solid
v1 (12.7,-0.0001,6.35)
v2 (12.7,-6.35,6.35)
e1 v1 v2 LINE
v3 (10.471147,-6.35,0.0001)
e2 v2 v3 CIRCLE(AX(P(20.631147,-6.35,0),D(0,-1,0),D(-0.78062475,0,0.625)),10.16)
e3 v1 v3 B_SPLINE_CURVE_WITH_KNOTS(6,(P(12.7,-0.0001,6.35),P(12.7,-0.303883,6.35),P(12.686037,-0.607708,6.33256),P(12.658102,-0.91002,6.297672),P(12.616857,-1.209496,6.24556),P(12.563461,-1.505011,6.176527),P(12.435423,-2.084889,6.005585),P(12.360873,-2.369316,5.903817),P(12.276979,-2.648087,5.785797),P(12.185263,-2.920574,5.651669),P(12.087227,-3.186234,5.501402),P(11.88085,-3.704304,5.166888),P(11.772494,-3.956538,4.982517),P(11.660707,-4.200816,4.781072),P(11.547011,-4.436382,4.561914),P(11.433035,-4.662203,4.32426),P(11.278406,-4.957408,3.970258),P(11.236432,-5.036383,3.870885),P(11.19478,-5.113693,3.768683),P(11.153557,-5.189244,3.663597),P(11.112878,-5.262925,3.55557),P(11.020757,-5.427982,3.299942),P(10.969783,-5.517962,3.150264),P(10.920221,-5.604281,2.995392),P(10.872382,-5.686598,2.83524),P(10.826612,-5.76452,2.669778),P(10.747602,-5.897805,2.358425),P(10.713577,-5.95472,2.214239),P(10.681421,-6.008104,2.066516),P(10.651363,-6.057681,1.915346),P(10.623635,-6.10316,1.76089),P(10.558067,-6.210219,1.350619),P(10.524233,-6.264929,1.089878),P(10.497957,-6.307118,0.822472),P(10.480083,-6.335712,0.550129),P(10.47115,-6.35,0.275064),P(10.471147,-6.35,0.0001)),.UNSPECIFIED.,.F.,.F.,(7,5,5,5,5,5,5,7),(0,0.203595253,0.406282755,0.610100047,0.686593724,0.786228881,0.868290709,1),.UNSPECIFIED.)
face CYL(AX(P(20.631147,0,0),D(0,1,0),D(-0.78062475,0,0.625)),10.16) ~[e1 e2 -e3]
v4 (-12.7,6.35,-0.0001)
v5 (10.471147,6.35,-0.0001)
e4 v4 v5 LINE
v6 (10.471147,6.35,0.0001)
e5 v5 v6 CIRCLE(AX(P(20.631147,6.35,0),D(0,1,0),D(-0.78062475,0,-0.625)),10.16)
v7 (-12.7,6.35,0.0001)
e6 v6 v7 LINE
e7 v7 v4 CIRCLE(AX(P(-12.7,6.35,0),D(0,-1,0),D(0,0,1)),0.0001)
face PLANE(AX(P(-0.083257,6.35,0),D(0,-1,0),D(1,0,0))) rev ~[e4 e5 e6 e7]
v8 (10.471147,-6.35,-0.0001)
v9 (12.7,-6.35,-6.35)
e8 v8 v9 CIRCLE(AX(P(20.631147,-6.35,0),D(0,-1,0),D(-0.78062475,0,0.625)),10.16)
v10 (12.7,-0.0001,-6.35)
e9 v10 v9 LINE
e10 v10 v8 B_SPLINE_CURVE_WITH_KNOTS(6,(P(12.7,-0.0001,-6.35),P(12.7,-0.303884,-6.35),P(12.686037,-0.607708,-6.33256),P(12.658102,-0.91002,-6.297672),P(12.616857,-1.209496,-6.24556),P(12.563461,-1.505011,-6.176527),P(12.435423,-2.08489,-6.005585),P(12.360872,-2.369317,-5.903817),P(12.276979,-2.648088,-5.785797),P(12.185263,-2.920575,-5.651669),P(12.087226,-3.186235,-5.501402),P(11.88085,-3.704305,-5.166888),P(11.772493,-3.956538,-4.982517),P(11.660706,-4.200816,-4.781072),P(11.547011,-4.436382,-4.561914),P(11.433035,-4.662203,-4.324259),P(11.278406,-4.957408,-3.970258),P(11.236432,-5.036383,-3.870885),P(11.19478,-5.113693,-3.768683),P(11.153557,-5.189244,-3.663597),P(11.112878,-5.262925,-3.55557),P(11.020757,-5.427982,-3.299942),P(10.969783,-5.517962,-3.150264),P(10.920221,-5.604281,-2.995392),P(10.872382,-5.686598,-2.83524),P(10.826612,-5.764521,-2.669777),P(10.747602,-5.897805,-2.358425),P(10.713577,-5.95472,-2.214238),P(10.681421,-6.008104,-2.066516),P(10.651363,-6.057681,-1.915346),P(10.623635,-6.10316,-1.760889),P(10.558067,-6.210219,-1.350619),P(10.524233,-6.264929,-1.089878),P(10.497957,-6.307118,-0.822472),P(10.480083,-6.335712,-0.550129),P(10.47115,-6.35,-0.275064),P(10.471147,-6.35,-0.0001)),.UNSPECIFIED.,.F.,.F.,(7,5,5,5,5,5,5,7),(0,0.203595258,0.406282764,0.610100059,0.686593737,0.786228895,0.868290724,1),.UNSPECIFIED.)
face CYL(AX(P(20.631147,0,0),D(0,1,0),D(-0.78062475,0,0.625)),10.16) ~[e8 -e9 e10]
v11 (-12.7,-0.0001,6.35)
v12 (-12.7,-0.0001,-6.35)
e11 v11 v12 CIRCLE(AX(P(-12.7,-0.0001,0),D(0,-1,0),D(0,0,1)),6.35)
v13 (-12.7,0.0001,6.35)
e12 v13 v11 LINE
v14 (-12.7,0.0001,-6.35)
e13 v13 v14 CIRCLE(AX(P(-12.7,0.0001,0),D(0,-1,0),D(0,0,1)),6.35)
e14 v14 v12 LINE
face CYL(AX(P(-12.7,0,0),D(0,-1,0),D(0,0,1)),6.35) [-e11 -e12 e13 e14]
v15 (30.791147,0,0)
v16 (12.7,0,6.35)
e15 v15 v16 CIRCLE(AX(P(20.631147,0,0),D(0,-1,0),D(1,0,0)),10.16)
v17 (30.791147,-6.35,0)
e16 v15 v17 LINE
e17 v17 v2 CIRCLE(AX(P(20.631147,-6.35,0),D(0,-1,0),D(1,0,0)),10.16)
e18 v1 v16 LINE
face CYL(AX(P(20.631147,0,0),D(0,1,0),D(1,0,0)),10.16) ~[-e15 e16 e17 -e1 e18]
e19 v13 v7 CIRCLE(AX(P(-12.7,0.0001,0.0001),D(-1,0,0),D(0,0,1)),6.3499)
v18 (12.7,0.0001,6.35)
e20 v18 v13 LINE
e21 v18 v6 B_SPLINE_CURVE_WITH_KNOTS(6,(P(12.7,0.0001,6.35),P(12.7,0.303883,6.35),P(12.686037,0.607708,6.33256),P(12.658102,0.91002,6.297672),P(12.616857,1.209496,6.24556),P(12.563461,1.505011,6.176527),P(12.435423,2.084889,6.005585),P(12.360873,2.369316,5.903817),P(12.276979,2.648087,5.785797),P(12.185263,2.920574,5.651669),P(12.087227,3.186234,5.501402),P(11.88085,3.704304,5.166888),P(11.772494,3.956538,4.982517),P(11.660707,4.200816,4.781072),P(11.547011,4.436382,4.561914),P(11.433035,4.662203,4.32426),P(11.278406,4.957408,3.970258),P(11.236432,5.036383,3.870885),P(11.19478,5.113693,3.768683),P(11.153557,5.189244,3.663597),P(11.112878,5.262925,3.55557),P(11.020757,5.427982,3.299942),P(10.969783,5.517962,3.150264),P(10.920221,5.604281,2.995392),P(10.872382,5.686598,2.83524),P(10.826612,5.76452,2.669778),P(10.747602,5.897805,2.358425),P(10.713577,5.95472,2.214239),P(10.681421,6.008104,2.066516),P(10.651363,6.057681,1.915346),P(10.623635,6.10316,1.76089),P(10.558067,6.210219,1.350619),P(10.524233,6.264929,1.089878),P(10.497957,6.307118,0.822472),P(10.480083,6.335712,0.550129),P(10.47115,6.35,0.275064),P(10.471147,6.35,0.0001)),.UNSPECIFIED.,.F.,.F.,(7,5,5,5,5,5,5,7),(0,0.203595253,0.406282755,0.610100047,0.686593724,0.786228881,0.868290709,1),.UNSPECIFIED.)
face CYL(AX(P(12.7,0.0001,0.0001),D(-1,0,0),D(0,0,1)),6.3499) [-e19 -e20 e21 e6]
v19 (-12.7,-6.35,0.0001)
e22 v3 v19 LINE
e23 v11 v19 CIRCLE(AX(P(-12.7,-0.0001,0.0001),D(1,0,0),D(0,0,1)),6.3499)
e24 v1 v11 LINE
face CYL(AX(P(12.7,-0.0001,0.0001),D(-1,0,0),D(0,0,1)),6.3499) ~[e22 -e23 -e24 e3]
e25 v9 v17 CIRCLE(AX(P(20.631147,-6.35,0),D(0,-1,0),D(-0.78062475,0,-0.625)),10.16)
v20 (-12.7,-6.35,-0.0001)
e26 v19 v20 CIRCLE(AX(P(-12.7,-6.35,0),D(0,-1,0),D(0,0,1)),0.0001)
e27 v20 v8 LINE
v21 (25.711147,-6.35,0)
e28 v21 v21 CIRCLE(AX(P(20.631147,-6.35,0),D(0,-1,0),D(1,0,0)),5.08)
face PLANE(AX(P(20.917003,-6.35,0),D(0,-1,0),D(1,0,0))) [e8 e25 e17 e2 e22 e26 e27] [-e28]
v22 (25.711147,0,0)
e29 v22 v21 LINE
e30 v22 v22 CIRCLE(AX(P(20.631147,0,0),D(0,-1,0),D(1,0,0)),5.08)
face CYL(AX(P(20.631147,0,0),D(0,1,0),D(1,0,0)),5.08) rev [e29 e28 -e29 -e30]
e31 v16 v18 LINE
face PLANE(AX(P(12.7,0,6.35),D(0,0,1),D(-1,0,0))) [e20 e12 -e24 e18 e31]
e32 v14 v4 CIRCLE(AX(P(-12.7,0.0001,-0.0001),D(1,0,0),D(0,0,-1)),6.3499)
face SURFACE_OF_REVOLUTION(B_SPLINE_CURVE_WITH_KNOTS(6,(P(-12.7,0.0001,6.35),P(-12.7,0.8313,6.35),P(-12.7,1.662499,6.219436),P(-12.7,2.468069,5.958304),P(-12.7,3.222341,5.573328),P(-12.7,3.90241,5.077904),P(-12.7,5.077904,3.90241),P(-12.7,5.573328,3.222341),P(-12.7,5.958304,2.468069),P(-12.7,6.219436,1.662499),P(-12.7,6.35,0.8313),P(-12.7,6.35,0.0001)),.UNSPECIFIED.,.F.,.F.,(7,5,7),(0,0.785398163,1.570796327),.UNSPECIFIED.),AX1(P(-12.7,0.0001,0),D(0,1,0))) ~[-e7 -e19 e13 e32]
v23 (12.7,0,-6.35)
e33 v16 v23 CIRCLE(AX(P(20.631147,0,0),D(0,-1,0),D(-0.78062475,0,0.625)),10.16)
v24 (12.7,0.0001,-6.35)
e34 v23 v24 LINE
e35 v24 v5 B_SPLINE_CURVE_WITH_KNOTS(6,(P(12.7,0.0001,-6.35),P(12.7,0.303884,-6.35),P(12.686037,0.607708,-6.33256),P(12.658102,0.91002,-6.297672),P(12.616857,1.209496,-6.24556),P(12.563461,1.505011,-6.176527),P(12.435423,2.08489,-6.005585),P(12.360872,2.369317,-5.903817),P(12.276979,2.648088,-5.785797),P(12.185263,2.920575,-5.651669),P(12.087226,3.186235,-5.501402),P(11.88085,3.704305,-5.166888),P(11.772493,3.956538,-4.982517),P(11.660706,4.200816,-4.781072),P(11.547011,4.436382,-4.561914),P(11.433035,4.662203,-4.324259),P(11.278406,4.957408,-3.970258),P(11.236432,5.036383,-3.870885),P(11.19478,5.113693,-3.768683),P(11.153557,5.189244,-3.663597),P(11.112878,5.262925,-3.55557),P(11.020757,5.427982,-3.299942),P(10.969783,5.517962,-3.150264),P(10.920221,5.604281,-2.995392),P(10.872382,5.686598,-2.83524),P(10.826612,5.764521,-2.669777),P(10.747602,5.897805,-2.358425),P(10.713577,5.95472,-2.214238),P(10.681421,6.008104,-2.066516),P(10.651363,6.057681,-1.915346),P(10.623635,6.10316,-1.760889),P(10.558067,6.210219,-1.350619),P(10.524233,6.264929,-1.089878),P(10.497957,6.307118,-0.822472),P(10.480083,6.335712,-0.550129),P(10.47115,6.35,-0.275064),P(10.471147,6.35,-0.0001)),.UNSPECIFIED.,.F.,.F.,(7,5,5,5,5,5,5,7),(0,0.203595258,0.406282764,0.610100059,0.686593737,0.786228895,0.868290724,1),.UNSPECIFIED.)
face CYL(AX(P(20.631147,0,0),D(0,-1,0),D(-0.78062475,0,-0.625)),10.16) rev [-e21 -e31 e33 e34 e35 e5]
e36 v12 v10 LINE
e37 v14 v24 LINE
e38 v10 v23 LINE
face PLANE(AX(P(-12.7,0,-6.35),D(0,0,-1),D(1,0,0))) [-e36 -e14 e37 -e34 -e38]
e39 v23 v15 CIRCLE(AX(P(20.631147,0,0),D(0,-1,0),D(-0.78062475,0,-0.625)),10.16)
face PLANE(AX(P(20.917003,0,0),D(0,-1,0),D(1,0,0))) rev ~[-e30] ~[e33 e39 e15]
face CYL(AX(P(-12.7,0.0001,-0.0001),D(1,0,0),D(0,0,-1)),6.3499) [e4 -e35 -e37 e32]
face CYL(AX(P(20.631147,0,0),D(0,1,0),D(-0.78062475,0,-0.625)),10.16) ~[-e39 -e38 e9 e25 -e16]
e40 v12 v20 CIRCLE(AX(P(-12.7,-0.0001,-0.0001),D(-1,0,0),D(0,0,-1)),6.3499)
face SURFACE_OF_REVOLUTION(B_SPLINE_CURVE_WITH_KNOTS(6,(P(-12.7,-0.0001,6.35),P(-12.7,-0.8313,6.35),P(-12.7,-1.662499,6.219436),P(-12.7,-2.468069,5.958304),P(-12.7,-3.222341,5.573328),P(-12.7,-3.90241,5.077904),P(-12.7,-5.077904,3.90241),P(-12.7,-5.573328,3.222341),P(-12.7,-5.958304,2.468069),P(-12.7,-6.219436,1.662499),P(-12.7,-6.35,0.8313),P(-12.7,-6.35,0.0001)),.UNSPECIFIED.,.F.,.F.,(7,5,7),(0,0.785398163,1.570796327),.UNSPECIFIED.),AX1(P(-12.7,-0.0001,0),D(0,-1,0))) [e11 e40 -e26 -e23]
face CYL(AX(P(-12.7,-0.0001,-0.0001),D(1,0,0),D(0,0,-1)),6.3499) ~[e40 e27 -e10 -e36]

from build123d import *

# Parameters (mm, degrees)
F1_DEPTH = 6.35
F2_R     = 6.3499
F0_R     = 5.08
F3_DEPTH = 6.35


# Not quite as in the source:
# - a fillet or chamfer is up to 0.001 mm smaller than in the source, because OpenCascade refuses the exact size


with BuildPart() as f1:
    # F0 (on Front) → F1 (new body, symmetric)
    with BuildSketch(Plane.XZ):
        with BuildLine():
            Line((12.7, 6.35), (-12.7, 6.35))
            Line((-12.7, 6.35), (-12.7, -6.35))
            Line((-12.7, -6.35), (12.7, -6.35))
            ThreePointArc((12.7, -6.35), (10.471147458, 0), (12.7, 6.35))
        make_face()
        with BuildLine():
            Line((-12.7, -6.35), (-12.7, 6.35))
            ThreePointArc((-12.7, 6.35), (-19.05, 0), (-12.7, -6.35))
        make_face()
    extrude(amount=F1_DEPTH, both=True)

    # F2 (radius 6.35 in the source; OpenCascade refuses exactly that, so slightly less here)
    f2_edges = [f1.edges().sort_by_distance(p)[0] for p in [
        (0, -6.35, 6.35),
        (0, 6.35, 6.35),
        (0, -6.35, -6.35),
        (0, 6.35, -6.35),
    ]]
    fillet(f2_edges, radius=F2_R)

    # F0 (on Front) → F3 (join)
    with BuildSketch(Plane.XZ):
        with BuildLine():
            ThreePointArc((30.791147458, 0), (23.9960502669, 9.5866067556), (12.7, 6.35))
            Line((12.7, 6.35), (12.7, -6.35))
            ThreePointArc((12.7, -6.35), (23.9960502669, -9.5866067556), (30.791147458, 0))
        make_face()
        with Locations((20.631147458, 0)):
            Circle(F0_R, mode=Mode.SUBTRACT)
        with BuildLine():
            Line((12.7, -6.35), (12.7, 6.35))
            ThreePointArc((12.7, 6.35), (10.471147458, 0), (12.7, -6.35))
        make_face()
    extrude(amount=F3_DEPTH)


solid = f1.part
